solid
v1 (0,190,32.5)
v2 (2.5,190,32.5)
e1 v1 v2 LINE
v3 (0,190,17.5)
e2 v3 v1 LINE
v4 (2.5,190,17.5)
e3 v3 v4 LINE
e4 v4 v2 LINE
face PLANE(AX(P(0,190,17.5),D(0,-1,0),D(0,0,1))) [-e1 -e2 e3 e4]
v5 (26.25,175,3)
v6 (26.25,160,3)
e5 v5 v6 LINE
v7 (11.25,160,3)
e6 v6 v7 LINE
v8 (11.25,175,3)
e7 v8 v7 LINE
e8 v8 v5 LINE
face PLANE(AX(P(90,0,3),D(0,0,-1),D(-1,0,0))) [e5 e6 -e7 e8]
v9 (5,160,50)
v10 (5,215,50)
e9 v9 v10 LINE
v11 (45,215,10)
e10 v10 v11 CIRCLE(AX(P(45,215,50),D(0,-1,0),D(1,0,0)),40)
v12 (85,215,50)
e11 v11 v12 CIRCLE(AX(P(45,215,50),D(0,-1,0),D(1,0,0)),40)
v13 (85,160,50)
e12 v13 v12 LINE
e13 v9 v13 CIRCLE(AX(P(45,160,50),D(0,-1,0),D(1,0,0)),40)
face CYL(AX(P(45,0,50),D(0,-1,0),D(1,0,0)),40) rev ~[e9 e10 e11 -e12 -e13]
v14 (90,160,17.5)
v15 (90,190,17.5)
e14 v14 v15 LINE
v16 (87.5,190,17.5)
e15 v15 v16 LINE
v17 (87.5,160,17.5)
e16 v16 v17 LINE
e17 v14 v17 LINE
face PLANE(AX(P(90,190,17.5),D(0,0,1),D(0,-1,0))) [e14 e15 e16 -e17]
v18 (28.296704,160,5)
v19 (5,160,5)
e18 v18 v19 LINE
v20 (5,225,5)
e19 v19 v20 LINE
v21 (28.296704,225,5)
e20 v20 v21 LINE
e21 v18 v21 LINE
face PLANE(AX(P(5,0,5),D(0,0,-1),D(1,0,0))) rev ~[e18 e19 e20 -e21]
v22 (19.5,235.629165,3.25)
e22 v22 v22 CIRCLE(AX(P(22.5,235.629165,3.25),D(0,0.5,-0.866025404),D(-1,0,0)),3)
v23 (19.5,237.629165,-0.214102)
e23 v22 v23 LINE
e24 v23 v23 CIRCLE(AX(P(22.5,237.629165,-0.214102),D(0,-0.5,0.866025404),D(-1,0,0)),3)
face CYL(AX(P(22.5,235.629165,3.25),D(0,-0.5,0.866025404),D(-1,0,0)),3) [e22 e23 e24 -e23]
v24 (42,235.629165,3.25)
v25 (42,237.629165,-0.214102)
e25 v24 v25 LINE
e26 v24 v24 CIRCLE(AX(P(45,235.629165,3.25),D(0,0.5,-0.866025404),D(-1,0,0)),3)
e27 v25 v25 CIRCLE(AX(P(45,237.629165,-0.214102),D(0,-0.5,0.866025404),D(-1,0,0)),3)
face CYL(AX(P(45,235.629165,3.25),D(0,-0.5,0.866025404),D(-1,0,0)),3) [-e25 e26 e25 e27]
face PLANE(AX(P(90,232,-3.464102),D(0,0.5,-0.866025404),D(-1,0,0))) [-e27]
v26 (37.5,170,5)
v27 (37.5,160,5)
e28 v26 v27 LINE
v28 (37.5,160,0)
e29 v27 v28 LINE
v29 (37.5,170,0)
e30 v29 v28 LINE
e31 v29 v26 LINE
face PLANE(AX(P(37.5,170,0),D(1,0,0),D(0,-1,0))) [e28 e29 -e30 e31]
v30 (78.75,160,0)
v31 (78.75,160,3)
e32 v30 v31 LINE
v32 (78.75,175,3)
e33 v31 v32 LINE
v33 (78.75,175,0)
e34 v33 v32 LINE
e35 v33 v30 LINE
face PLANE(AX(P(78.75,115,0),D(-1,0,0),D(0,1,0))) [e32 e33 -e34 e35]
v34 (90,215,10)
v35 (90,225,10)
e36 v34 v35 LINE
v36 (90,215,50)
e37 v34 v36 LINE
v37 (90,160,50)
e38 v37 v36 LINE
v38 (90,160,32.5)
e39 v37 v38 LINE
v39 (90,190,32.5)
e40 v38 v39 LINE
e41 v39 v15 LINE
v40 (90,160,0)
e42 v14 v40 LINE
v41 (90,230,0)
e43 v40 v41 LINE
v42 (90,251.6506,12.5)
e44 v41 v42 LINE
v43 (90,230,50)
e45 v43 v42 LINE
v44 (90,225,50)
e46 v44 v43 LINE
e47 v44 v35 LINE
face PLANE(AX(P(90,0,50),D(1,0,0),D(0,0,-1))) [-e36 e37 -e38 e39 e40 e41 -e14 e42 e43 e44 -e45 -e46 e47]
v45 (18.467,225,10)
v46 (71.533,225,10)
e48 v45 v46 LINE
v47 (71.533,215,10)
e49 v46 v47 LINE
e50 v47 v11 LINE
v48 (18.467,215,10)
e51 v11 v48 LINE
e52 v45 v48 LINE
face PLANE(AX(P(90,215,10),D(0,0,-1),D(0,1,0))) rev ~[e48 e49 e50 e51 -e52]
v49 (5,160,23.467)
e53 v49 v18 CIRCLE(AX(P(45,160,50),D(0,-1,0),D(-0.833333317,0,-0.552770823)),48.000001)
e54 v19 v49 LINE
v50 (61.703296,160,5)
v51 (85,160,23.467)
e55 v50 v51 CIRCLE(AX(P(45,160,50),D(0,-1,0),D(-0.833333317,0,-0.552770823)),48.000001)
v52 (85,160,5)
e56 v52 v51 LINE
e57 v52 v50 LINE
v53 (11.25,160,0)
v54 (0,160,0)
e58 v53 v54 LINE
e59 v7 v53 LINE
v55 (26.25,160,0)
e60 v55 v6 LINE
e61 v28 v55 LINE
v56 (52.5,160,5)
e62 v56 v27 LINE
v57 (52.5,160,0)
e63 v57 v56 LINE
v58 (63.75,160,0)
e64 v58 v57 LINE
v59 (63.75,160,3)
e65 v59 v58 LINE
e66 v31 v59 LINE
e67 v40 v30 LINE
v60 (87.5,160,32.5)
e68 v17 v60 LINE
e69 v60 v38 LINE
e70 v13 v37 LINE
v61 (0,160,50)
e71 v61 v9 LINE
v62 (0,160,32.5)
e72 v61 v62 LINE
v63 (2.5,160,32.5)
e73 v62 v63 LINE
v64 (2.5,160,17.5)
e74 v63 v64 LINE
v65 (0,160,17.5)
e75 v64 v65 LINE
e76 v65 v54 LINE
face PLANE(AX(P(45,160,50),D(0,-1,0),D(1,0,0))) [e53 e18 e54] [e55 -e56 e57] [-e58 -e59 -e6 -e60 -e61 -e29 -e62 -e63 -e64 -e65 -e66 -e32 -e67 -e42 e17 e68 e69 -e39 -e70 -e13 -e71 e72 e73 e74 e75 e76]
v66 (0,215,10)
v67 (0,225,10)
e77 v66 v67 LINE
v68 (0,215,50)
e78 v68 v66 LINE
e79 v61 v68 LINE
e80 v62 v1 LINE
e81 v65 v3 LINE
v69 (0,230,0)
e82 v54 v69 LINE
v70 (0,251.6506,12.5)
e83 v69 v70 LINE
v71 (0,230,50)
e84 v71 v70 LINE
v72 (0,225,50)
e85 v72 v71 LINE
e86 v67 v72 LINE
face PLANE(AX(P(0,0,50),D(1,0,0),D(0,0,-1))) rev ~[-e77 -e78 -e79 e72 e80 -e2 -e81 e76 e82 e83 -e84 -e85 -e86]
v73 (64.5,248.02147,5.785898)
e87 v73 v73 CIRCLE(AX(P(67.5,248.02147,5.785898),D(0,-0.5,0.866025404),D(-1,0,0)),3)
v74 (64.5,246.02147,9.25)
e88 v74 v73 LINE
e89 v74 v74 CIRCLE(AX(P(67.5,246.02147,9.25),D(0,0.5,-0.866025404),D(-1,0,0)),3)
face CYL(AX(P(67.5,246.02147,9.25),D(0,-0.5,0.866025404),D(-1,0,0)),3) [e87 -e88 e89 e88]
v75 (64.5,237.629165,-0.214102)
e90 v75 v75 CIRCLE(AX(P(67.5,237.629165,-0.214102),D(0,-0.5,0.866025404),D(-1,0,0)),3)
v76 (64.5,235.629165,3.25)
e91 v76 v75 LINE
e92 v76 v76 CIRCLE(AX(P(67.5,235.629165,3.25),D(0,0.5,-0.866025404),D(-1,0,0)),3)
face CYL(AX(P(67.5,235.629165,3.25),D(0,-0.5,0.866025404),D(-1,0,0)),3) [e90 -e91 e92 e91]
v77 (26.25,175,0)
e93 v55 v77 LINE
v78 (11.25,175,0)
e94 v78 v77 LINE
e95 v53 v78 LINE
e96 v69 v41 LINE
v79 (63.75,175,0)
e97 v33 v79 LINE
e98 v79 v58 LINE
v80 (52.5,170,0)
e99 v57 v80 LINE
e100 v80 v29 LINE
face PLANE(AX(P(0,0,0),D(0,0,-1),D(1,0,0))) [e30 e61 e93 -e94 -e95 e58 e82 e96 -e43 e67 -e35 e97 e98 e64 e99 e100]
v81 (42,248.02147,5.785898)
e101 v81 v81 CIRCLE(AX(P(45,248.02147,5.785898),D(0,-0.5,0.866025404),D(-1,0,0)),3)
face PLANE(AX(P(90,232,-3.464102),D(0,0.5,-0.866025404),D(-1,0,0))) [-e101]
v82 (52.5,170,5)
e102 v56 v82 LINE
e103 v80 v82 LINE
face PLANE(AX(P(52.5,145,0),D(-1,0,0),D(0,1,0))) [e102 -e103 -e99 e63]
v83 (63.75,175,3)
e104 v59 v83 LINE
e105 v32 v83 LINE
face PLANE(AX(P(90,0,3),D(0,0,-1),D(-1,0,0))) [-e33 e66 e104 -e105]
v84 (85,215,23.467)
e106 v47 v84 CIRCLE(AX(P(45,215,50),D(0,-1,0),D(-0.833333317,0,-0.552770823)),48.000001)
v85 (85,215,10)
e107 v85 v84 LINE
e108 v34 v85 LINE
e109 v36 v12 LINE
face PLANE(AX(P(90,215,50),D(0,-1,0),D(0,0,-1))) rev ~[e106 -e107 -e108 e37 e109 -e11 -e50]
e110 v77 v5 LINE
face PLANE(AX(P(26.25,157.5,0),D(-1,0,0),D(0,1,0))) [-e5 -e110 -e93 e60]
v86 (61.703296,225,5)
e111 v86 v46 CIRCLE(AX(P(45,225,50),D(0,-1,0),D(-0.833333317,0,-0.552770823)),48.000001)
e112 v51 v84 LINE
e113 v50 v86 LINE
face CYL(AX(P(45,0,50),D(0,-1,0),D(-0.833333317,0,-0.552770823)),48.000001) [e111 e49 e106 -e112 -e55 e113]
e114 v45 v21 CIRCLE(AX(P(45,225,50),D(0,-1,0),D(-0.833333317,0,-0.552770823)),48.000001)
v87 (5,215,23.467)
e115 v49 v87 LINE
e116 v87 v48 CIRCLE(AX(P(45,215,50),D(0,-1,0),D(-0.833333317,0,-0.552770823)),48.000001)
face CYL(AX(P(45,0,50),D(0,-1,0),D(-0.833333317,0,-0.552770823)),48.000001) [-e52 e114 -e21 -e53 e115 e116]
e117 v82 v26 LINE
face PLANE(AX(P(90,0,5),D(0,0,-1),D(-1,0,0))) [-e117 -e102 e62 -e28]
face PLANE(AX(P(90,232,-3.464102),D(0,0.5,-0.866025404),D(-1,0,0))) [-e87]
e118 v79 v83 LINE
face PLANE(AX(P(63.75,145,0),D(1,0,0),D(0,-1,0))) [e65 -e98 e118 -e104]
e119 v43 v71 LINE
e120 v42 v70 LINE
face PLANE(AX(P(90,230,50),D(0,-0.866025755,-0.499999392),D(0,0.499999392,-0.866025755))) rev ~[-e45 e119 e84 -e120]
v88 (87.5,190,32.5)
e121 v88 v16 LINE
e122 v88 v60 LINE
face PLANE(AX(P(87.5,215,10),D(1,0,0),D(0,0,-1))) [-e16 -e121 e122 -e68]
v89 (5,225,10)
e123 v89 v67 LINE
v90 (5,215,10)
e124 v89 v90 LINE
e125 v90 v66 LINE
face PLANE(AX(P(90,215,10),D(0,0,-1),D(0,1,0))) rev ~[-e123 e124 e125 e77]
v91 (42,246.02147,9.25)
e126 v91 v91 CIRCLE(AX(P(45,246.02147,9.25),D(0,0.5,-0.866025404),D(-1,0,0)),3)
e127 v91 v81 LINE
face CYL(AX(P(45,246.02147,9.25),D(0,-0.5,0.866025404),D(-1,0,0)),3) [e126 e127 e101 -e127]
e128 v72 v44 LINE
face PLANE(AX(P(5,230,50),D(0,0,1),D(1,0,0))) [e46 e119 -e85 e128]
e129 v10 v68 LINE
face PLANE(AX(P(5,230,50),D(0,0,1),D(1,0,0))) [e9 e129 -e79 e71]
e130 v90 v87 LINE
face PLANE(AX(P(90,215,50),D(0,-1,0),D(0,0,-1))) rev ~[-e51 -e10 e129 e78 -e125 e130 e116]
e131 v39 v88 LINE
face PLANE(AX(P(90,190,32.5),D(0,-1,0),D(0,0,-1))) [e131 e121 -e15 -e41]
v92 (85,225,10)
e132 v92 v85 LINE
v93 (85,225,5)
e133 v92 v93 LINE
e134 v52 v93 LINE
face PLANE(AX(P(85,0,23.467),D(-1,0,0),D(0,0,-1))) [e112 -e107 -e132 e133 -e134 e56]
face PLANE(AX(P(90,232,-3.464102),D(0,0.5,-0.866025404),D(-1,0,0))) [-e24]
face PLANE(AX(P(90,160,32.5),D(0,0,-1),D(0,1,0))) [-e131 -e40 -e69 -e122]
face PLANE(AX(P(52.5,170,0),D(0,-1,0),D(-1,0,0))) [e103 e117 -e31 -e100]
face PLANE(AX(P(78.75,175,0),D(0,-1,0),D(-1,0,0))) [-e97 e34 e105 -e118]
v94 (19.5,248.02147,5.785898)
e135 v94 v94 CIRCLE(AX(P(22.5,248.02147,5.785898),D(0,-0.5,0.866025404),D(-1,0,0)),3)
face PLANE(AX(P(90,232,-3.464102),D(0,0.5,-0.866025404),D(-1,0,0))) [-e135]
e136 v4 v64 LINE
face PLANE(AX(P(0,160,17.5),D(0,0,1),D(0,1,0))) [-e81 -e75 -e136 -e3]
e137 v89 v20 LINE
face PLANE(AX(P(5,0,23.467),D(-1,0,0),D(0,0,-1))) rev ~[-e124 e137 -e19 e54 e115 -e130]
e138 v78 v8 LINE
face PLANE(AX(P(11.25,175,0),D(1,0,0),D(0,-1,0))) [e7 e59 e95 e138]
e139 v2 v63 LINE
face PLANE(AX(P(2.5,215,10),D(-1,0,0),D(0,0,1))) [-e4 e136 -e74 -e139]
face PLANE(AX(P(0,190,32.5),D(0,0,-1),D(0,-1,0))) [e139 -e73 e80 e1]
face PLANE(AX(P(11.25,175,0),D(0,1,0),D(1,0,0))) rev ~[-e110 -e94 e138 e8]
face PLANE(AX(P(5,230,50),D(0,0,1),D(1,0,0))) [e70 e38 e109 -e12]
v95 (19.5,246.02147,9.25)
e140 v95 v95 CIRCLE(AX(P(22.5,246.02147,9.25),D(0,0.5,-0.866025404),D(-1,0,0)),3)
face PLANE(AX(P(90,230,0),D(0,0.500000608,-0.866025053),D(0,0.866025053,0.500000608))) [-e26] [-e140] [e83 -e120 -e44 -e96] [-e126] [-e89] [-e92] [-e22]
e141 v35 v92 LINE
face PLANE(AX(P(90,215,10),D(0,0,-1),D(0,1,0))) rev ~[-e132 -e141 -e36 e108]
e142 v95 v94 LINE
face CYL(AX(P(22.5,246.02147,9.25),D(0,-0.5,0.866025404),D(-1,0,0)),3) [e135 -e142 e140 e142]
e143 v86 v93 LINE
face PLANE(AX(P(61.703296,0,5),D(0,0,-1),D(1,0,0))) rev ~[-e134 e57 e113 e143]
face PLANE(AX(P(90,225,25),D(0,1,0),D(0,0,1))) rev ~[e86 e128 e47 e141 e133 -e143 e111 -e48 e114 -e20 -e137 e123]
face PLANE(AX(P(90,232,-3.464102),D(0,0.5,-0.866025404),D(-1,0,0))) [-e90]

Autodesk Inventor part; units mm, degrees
ref_plane "YZ Plane" through (0, 0, 0) normal (1, 0, 0) x (0, 1, 0)
ref_plane "XZ Plane" through (0, 0, 0) normal (0, 1, 0) x (-1, 0, 0)
ref_plane "XY Plane" through (0, 0, 0) normal (0, 0, 1) x (1, 0, 0)
sketch "スケッチ1" plane through (0, 0, 0) normal (0, 1, 0) x (-1, 0, 0)
  line L0 (0, 0) -> (-90, 0)
  line L1 (-90, 0) -> (-90, 50)
  line L2 (0, 50) -> (0, 0)
  line L3 (0, 0) -> (-5, 0)
  line L4 (-5, 0) -> (-5, 50)
  line L5 (-5, 0) -> (-90, 0)
  line L6 (-90, 0) -> (-85, 0)
  line L7 (-85, 0) -> (-85, 50)
  arc A0 (-85, 50) -> (-5, 50) centre (-45, 50) ccw
  line L8 (0, 0) -> (0, 10)
  line L9 (0, 10) -> (-90, 10)
  circle A1 centre (-45, 50) radius 45
  line L10 (-90, 5) -> (0, 5)
  line L11 (-90, 50) -> (-85, 50)
  line L12 (-5, 50) -> (0, 50)
  line L13 (0, 0) -> (-90, 0)
  line L14 (-90, 0) -> (-90, 5)
  line L15 (-90, 5) -> (0, 5)
  line L16 (0, 5) -> (0, 0)
  dimension "d0" = 90
  dimension "d1" = 50
  dimension "d2" = 5
  dimension "d3" = 85
  dimension "d4" = 5
  dimension "d5" = 80
  dimension "d6" = 10
  dimension "d7" = 90
extrude "押し出し1" add sketch "スケッチ1" along normal blind 230 contours L0 L4 L10 L2 | L0 L7 L10 L4 | L10 L4 L9 L2 | L0 L1 L10 L7 | L10 A1 L9 L4 | L9 L4 A1 L2 | L10 L1 L9 L7 | L7 L9 A1 L10 | L9 A1 L4 | A1 L9 | A1 L4 L12 | L9 L1 A1 L7 | L7 A1 L9 | A1 L9 A0 L4 | A1 L7 A0 L9 | L11 L7 A1
sketch "スケッチ2" plane through (0, 0, 0) normal (0, -1, 0) x (1, 0, 0)
  line L0 (0, 0) -> (0, 50) projected
  line L1 (90, 0) -> (0, 0) projected
  line L2 (90, 50) -> (90, 0) projected
  line L3 (85, 50) -> (90, 50) projected
  arc A0 (5, 50) -> (85, 50) centre (45, 50) ccw projected
  line L4 (0, 50) -> (5, 50) projected
  arc A1 (5, 23.467) -> (85, 23.467) centre (45, 50) ccw
  line L5 (0, 5) -> (90, 5)
  line L6 (5, 23.467) -> (5, 5)
  line L7 (85, 23.467) -> (85, 5)
  dimension "d29" = 48
extrude "押し出し2" cut sketch "スケッチ2" against normal blind 225 contours L6 A1 L5 | L5 A1 L7
sketch "スケッチ3" plane through (0, 230, 0) normal (0, 1, 0) x (1, 0, 0)
  arc A0 (85, -50) -> (5, -50) centre (45, -50) ccw projected
  line L0 (90, -50) -> (90, 0) projected
  line L1 (0, -50) -> (5, -50) projected
  arc A1 (85, -50) -> (5, -50) centre (45, -50) ccw
  line L2 (5, -50) -> (85, -50)
extrude "押し出し3" add sketch "スケッチ3" against normal blind 5
sketch "スケッチ4" plane through (90, 0, 50) normal (1, 0, 0) x (0, 0, -1)
  line L0 (0, 0) -> (50, 0) projected
  line L1 (0, 0) -> (0, 230) projected
  line L2 (25, 0) -> (25, 65)
  line L3 (25, 65) -> (25, 75)
  line L4 (25, 75) -> (25, 215)
  line L5 (25, 215) -> (25, 225)
  line L6 (0, 65) -> (40, 65)
  line L7 (40, 65) -> (40, 75)
  line L8 (40, 75) -> (0, 75)
  line L9 (0, 75) -> (0, 65)
  line L10 (0, 215) -> (40, 215)
  line L11 (40, 215) -> (40, 225)
  line L12 (40, 225) -> (0, 225)
  line L13 (0, 225) -> (0, 215)
  dimension "d16" = 65
  dimension "d17" = 10
  dimension "d18" = 140
  dimension "d19" = 10
  dimension "d20" = 40
extrude "押し出し4" cut sketch "スケッチ4" against normal blind 90 contours L1 L8 L3 L6 | L3 L8 L7 L6 | L1 L12 L5 L10 | L5 L12 L11 L10
sketch "スケッチ6" plane through (90, 0, 50) normal (1, 0, 0) x (0, 0, -1)
  line L0 (0, 230) -> (50, 230) projected
  line L1 (50, 230) -> (37.5, 251.6506)
  line L2 (50, 230) -> (110, 230) construction
  line L3 (0, 230) -> (37.5, 251.6506)
  line L4 (0, 230) -> (43.3013, 230) construction
  dimension "d32" = 120
  dimension "d33" = 30
extrude "押し出し6" add sketch "スケッチ6" against normal blind 90
sketch "スケッチ9" plane through (0, 0, 0) normal (-1, 0, 0) x (0, 0, 1)
  line L0 (10, 225) -> (50, 225) projected
  line L1 (50, 225) -> (50, 230) projected
  line L2 (50, 230) -> (12.5, 251.6506) projected
  line L3 (12.5, 251.6506) -> (0, 230) projected
  line L4 (0, 0) -> (0, 230) projected
  line L5 (0, 0) -> (50, 0) projected
  line L6 (50, 0) -> (50, 65) projected
  line L7 (50, 65) -> (10, 65) projected
  line L8 (10, 65) -> (10, 75) projected
  line L9 (10, 75) -> (50, 75) projected
  line L10 (50, 75) -> (50, 215) projected
  line L11 (50, 215) -> (10, 215) projected
  line L12 (10, 215) -> (10, 225) projected
  line L13 (12.5, 251.6506) -> (0, 230)
  line L14 (0, 230) -> (-132.7906, 0)
  line L15 (0, 145) -> (-49.0748, 145)
  line L16 (0, 115) -> (-66.3953, 115)
  dimension "d45" = 30
sketch "スケッチ10" plane through (0, 0, 0) normal (-1, 0, 0) x (0, 0, 1)
  line L0 (10, 225) -> (50, 225) projected
  line L1 (50, 225) -> (50, 230) projected
  line L2 (50, 230) -> (12.5, 251.6506) projected
  line L3 (12.5, 251.6506) -> (0, 230) projected
  line L4 (0, 0) -> (0, 230) projected
  line L5 (0, 0) -> (50, 0) projected
  line L6 (50, 0) -> (50, 65) projected
  line L7 (50, 65) -> (10, 65) projected
  line L8 (10, 65) -> (10, 75) projected
  line L9 (10, 75) -> (50, 75) projected
  line L10 (50, 75) -> (50, 215) projected
  line L11 (50, 215) -> (10, 215) projected
  line L12 (10, 215) -> (10, 225) projected
  line L13 (12.5, 251.6506) -> (-87.5, 78.4456)
  line L14 (-87.5, 78.4456) -> (50, 0)
sketch "スケッチ12" plane through (90, 0, 50) normal (1, 0, 0) x (0, 0, -1)
  line L0 (50, 0) -> (50, 230) projected
  line L1 (40, 225) -> (40, 215) projected
  line L2 (0, 215) -> (0, 75)
  line L3 (0, 145) -> (50, 145)
  line L4 (32.5, 175) -> (17.5, 175)
  line L5 (17.5, 175) -> (17.5, 115)
  line L6 (17.5, 115) -> (32.5, 115)
  line L7 (32.5, 115) -> (32.5, 175)
  line L8 (32.5, 175) -> (17.5, 115) construction
  line L9 (17.5, 175) -> (32.5, 115) construction
  line L10 (17.5, 145) -> (32.5, 145)
  line L11 (32.5, 145) -> (32.5, 115)
  line L12 (32.5, 115) -> (17.5, 115)
  line L13 (17.5, 115) -> (17.5, 145)
  point P0 (25, 145)
  dimension "d59" = 15
  dimension "d60" = 60
extrude "押し出し8" cut sketch "スケッチ12" against normal blind 2.5 contours L3 L7 L6 L5
sketch "スケッチ13" plane through (0, 0, 0) normal (-1, 0, 0) x (0, 0, 1)
  line L0 (0, 0) -> (0, 230) projected
  line L1 (50, 75) -> (50, 215) projected
  line L2 (50, 145) -> (0, 145)
  line L3 (17.5, 175) -> (32.5, 175)
  line L4 (32.5, 175) -> (32.5, 115)
  line L5 (32.5, 115) -> (17.5, 115)
  line L6 (17.5, 115) -> (17.5, 175)
  line L7 (17.5, 175) -> (32.5, 115) construction
  line L8 (32.5, 175) -> (17.5, 115) construction
  line L9 (17.5, 145) -> (32.5, 145)
  line L10 (32.5, 145) -> (32.5, 115)
  line L11 (32.5, 115) -> (17.5, 115)
  line L12 (17.5, 115) -> (17.5, 145)
  point P0 (25, 145)
  dimension "d63" = 15
  dimension "d64" = 60
extrude "押し出し9" cut sketch "スケッチ13" against normal blind 2.5 contours L4 L5 L6 L2
sketch "スケッチ14" plane through (90, 0, 0) normal (0, 0, -1) x (-1, 0, 0)
  line L0 (90, 0) -> (90, 230) projected
  line L1 (0, 0) -> (0, 230) projected
  line L2 (0, 145) -> (90, 145)
  line L3 (37.5, 170) -> (52.5, 170)
  line L4 (52.5, 170) -> (52.5, 120)
  line L5 (52.5, 120) -> (37.5, 120)
  line L6 (37.5, 120) -> (37.5, 170)
  line L7 (37.5, 170) -> (52.5, 120) construction
  line L8 (52.5, 170) -> (37.5, 120) construction
  line L9 (37.5, 145) -> (52.5, 145)
  line L10 (52.5, 145) -> (52.5, 170)
  line L11 (52.5, 170) -> (37.5, 170)
  line L12 (37.5, 170) -> (37.5, 145)
  point P0 (45, 145)
  dimension "d67" = 15
  dimension "d70" = 25
extrude "押し出し10" cut sketch "スケッチ14" against normal blind 5 contours L6 L3 L4 L2
sketch "スケッチ16" plane through (90, 0, 0) normal (0, 0, -1) x (-1, 0, 0)
  line L0 (52.5, 170) -> (52.5, 145) projected
  line L1 (52.5, 145) -> (37.5, 145) projected
  line L2 (37.5, 145) -> (37.5, 170) projected
  line L3 (90, 0) -> (90, 230) projected
  line L4 (0, 0) -> (0, 230) projected
  line L5 (0, 145) -> (90, 145)
  line L6 (0, 160) -> (37.5, 157.5)
  line L7 (52.5, 157.5) -> (90, 157.5)
  line L8 (18.75, 158.75) -> (18.75, 145)
  line L9 (71.25, 145) -> (71.25, 157.5)
  line L10 (11.25, 175) -> (26.25, 175)
  line L11 (26.25, 175) -> (26.25, 115)
  line L12 (26.25, 115) -> (11.25, 115)
  line L13 (11.25, 115) -> (11.25, 175)
  line L14 (11.25, 175) -> (26.25, 115) construction
  line L15 (26.25, 175) -> (11.25, 115) construction
  line L16 (11.25, 115) -> (26.25, 115)
  line L17 (26.25, 115) -> (26.25, 175)
  line L18 (26.25, 175) -> (11.25, 175)
  line L19 (11.25, 175) -> (11.25, 115)
  line L20 (45, 145) -> (45, 125)
  line L21 (78.75, 175) -> (63.75, 175)
  line L22 (63.75, 115) -> (78.75, 115)
  line L23 (78.75, 175) -> (78.75, 115)
  line L24 (63.75, 115) -> (63.75, 175)
  line L25 (63.75, 175) -> (78.75, 175)
  line L26 (78.75, 175) -> (78.75, 115)
  line L27 (78.75, 115) -> (63.75, 115)
  line L28 (63.75, 115) -> (63.75, 175)
  line L29 (11.25, 115) -> (26.25, 115)
  line L30 (26.25, 115) -> (26.25, 175)
  line L31 (26.25, 175) -> (11.25, 175)
  line L32 (11.25, 175) -> (11.25, 115)
  dimension "d71" = 15
  dimension "d72" = 60
  dimension "d73" = 20
extrude "押し出し11" cut sketch "スケッチ16" against normal blind 3 contours L24 L21 L23 L7 | L7 L9 L5 L24 | L5 L23 L22 L24 | L7 L23 L5 L9 | L11 L12 L13 L5 | L5 L8 L6 L11 | L6 L13 L10 L11 | L5 L13 L6 L8
sketch "スケッチ17" plane through (37.5, 145, 0) normal (0, 1, 0) x (1, 0, 0)
  line L0 (-57.7643, 16.522) -> (69.053, 16.522)
  line L1 (69.053, 16.522) -> (69.053, -65.9751)
  line L2 (69.053, -65.9751) -> (-57.7643, -65.9751)
  line L3 (-57.7643, -65.9751) -> (-57.7643, 16.522)
  point P0 (-37.5, 0)
extrude "押し出し12" cut sketch "スケッチ17" against normal blind 180
sketch "スケッチ18" plane through (0, 215, 10) normal (-1, 0, 0) x (0, 0, 1)
  line L0 (-10, -70) -> (40, -70) projected
  line L1 (7.5, -40) -> (22.5, -40)
  line L2 (22.5, -40) -> (22.5, -100)
  line L3 (22.5, -100) -> (7.5, -100)
  line L4 (7.5, -100) -> (7.5, -40)
  line L5 (7.5, -40) -> (22.5, -100) construction
  line L6 (22.5, -40) -> (7.5, -100) construction
  point P0 (-10, -215)
  point P1 (15, -70)
  dimension "d78" = 15
  dimension "d79" = 60
extrude "押し出し13" add sketch "スケッチ18" against normal blind 2.5
sketch "スケッチ19" plane through (90, 215, 10) normal (1, 0, 0) x (0, 0, -1)
  line L0 (-40, -70) -> (10, -70) projected
  line L1 (-22.5, -40) -> (-7.5, -40)
  line L2 (-7.5, -40) -> (-7.5, -100)
  line L3 (-7.5, -100) -> (-22.5, -100)
  line L4 (-22.5, -100) -> (-22.5, -40)
  line L5 (-22.5, -40) -> (-7.5, -100) construction
  line L6 (-7.5, -40) -> (-22.5, -100) construction
  point P0 (10, -215)
  point P1 (-15, -70)
  dimension "d82" = 15
  dimension "d83" = 60
extrude "押し出し14" add sketch "スケッチ19" against normal blind 2.5
sketch "スケッチ20" plane through (90, 230, 0) normal (0, 0.5, -0.8660254) x (-1, 0, 0)
  line L0 (0, 0) -> (0, 25) projected
  line L1 (0, 0) -> (90, 0) projected
  line L2 (90, 25) -> (90, 0) projected
  line L3 (0, 25) -> (90, 25) projected
  line L4 (0, 12.5) -> (90, 12.5)
  line L5 (45, 12.5) -> (45, 25)
  line L6 (45, 12.5) -> (45, 0)
  line L7 (22.5, 18.5) -> (67.5, 18.5)
  line L8 (67.5, 18.5) -> (67.5, 6.5)
  line L9 (67.5, 6.5) -> (22.5, 6.5)
  line L10 (22.5, 6.5) -> (22.5, 18.5)
  line L11 (22.5, 18.5) -> (67.5, 6.5) construction
  line L12 (67.5, 18.5) -> (22.5, 6.5) construction
  circle A0 centre (45, 6.5) radius 3
  circle A1 centre (67.5, 18.5) radius 3
  circle A2 centre (67.5, 6.5) radius 3
  circle A3 centre (22.5, 6.5) radius 3
  circle A4 centre (22.5, 18.5) radius 3
  circle A5 centre (45, 18.5) radius 3
  point P0 (90, -199.1858)
  dimension "d86" = 45
  dimension "d87" = 6
  dimension "d89" = 6
  dimension "d90" = 6
  dimension "d91" = 6
  dimension "d92" = 6
  dimension "d93" = 6
  dimension "d94" = 6
extrude "押し出し15" add sketch "スケッチ20" along normal blind 4 contours A0 L9 L6 | L6 L9 A0 | A3 L9 L10 | L10 L9 A3 | A4 L7 L10 | L10 L7 A4 | L9 A0 L6 | L6 A0 L9 | A5 L7 L5 | L5 L7 A5 | A5 L7 L5 | L5 L7 A5 | A2 L8 L9 | L9 L8 A2 | A1 L7 L8 | L8 L7 A1
ref_plane "作業平面2" through (45, 160, 50) normal (0, -1, 0) x (1, 0, 0)
sketch "スケッチ21" plane through (45, 160, 50) normal (0, -1, 0) x (1, 0, 0)
  line L0 (-52.9668, 19.8142) -> (54.3752, 19.8142)
  line L1 (54.3752, 19.8142) -> (54.3752, -61.5309)
  line L2 (54.3752, -61.5309) -> (-52.9668, -61.5309)
  line L3 (-52.9668, -61.5309) -> (-52.9668, 19.8142)
  line L4 (-52.9668, 19.8142) -> (54.3752, -61.5309) construction
  line L5 (54.3752, 19.8142) -> (-52.9668, -61.5309) construction
  point P0 (-45, -50)
  point P1 (0.7042, -20.8583)
extrude "押し出し16" cut sketch "スケッチ21" along normal blind 50
sketch "スケッチ22" plane through (90, 215, 10) normal (1, 0, 0) x (0, 0, -1)
  line L0 (-40, -55) -> (10, -55) projected
  line L1 (-22.5, -25) -> (-7.5, -25)
  line L2 (-7.5, -25) -> (-7.5, -85)
  line L3 (-7.5, -85) -> (-22.5, -85)
  line L4 (-22.5, -85) -> (-22.5, -25)
  line L5 (-22.5, -25) -> (-7.5, -85) construction
  line L6 (-7.5, -25) -> (-22.5, -85) construction
  point P0 (10, -215)
  point P1 (-15, -55)
  dimension "d100" = 15
  dimension "d101" = 60
extrude "押し出し17" cut sketch "スケッチ22" against normal blind 2.5
sketch "スケッチ23" plane through (0, 215, 10) normal (-1, 0, 0) x (0, 0, 1)
  line L0 (-10, -55) -> (40, -55) projected
  line L1 (7.5, -25) -> (22.5, -25)
  line L2 (22.5, -25) -> (22.5, -85)
  line L3 (22.5, -85) -> (7.5, -85)
  line L4 (7.5, -85) -> (7.5, -25)
  line L5 (7.5, -25) -> (22.5, -85) construction
  line L6 (22.5, -25) -> (7.5, -85) construction
  point P0 (-10, -215)
  point P1 (15, -55)
  dimension "d104" = 15
  dimension "d105" = 60
extrude "押し出し18" cut sketch "スケッチ23" against normal blind 2.5
properties part number "知能ロボコン発射台２.11" material "ABS プラスチック"
